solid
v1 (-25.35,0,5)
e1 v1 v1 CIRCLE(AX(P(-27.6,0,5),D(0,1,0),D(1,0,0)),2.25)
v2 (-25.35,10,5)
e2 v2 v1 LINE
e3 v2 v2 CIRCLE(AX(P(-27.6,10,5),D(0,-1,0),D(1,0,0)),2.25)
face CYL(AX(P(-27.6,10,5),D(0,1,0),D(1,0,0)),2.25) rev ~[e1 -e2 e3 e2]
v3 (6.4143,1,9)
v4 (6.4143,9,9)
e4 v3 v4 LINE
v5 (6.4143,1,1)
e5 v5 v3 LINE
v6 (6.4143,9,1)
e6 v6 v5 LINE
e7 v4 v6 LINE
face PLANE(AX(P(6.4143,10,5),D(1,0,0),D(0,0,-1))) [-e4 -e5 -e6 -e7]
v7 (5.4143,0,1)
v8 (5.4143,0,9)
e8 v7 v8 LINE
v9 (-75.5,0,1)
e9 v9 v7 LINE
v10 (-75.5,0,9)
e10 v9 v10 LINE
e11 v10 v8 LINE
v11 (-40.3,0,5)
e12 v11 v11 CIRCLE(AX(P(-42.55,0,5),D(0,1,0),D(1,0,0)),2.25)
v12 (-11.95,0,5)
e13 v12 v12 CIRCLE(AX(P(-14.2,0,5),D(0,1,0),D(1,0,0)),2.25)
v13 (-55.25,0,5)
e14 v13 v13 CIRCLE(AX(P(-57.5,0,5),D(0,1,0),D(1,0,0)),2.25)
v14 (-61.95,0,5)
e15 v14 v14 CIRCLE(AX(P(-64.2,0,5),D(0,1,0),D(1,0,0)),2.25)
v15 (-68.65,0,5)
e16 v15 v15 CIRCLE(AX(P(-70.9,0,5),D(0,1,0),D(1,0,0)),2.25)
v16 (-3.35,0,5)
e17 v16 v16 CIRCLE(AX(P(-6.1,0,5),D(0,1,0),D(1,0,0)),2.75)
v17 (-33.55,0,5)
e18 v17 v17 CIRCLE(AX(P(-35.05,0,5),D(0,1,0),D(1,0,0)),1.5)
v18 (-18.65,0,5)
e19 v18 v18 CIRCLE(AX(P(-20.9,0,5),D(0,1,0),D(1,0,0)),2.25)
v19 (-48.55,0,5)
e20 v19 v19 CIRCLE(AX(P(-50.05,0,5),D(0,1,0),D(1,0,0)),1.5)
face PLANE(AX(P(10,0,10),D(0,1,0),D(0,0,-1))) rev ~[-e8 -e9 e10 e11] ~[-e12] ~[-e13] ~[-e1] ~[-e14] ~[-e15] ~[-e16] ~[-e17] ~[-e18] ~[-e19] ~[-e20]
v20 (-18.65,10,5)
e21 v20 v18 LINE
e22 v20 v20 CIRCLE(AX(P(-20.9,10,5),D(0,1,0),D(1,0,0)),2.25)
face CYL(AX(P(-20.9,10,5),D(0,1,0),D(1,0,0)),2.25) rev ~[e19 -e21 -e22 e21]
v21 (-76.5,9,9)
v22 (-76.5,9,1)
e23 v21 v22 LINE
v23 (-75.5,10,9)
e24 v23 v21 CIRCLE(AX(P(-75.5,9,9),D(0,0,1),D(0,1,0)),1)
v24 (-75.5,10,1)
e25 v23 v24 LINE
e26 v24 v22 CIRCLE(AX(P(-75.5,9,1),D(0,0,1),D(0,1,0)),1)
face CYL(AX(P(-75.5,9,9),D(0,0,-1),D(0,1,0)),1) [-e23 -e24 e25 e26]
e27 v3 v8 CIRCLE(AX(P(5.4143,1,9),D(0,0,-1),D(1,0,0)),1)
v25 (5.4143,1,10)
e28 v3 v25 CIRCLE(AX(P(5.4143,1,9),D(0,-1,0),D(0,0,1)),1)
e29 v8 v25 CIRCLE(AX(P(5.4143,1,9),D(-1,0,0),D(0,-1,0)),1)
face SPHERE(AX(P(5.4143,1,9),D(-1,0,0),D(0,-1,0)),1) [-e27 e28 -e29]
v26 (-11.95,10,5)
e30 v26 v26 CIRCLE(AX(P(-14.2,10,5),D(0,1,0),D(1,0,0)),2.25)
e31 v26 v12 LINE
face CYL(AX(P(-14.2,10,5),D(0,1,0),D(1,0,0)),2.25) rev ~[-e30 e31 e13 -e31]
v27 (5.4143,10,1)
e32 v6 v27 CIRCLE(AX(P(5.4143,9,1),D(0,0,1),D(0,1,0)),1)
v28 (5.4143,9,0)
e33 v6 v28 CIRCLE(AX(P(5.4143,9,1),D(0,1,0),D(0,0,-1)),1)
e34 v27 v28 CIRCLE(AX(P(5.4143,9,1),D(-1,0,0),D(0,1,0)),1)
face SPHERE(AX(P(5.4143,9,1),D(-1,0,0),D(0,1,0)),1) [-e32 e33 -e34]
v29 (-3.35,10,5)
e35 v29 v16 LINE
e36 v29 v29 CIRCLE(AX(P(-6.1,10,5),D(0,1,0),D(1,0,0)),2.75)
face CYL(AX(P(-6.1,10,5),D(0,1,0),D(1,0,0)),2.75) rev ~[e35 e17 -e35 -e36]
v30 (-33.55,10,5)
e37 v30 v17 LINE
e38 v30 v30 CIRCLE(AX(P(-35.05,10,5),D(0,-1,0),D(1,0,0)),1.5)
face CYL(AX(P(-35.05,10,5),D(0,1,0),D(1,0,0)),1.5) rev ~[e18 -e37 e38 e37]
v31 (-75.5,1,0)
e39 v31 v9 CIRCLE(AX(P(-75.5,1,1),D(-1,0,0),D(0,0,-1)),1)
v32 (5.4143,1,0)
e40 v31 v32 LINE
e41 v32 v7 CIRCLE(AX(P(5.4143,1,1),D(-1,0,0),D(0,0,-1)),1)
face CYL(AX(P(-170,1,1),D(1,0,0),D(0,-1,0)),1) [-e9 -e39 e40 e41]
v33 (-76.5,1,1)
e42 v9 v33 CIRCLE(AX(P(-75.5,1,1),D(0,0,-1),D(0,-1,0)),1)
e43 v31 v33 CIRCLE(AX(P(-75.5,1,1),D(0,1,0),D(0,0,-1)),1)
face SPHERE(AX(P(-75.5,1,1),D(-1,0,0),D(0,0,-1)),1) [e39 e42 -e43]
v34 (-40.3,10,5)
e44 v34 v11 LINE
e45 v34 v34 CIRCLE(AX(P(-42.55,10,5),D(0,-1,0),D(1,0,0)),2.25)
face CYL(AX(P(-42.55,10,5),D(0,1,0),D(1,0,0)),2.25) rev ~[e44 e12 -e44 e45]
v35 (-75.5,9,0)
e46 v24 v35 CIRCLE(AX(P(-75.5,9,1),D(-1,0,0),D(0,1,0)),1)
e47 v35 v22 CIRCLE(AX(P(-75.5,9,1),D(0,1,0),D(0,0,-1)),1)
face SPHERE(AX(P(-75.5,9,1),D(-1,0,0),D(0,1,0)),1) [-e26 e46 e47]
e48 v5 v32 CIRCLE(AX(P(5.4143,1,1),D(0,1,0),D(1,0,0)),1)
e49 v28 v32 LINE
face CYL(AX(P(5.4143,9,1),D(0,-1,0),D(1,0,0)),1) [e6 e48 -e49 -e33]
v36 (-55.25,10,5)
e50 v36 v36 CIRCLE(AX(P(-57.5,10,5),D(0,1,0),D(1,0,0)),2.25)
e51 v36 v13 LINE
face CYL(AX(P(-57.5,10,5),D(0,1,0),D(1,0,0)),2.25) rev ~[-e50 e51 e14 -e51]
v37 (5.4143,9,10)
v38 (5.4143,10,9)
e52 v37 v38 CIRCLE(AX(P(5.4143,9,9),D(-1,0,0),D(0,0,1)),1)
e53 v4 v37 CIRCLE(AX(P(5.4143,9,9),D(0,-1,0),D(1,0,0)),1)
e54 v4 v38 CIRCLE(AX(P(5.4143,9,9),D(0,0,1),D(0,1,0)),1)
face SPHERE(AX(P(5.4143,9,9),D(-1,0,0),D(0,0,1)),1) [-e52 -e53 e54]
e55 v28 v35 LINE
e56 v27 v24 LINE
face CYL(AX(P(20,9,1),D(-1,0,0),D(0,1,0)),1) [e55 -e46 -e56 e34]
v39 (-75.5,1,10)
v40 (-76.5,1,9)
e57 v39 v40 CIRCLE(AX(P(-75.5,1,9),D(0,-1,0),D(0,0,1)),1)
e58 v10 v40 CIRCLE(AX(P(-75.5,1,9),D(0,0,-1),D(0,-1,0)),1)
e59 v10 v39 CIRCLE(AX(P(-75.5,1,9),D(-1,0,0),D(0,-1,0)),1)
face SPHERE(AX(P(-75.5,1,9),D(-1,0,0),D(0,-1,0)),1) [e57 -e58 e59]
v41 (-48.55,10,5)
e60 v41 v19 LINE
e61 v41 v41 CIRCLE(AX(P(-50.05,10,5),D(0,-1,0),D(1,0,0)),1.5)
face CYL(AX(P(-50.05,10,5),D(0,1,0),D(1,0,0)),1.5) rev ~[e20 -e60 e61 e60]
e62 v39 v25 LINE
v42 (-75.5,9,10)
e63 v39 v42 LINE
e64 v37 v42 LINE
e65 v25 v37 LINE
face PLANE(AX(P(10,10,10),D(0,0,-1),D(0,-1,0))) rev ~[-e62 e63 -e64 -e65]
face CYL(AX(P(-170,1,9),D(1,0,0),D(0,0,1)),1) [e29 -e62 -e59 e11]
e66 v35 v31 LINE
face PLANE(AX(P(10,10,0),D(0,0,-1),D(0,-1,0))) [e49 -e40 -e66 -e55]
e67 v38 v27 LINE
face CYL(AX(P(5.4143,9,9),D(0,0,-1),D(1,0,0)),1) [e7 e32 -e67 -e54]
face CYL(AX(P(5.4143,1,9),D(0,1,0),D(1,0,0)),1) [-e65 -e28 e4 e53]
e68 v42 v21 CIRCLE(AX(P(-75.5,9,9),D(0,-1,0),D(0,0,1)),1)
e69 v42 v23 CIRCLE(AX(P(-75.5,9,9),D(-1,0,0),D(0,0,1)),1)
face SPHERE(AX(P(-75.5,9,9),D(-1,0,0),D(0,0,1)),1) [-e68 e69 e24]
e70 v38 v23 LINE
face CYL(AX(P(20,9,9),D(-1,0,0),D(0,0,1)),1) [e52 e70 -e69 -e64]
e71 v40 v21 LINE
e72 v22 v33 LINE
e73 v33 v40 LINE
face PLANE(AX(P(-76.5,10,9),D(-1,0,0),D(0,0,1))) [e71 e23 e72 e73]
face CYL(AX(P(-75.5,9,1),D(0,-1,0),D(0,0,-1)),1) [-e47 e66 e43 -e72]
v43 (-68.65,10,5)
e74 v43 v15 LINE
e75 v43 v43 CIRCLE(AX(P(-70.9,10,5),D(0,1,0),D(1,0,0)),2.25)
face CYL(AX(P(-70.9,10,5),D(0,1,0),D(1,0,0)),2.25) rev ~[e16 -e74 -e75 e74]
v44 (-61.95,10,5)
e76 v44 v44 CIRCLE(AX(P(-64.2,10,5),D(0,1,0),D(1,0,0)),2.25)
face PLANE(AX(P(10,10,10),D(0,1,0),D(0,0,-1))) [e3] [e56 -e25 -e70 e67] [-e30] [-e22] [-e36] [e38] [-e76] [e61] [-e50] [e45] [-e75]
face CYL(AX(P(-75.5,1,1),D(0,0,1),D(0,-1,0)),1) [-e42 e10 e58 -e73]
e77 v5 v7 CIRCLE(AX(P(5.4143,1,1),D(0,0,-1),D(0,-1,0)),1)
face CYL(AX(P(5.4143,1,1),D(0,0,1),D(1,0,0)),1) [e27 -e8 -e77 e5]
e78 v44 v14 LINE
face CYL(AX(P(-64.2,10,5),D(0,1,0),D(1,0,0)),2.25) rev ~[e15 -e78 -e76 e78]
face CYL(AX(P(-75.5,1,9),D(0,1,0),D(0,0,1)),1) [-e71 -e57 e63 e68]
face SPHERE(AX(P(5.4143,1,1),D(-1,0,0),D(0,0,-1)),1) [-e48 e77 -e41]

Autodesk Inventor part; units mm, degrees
ref_plane "YZ Plane" through (0, 0, 0) normal (1, 0, 0) x (0, 1, 0)
ref_plane "XZ Plane" through (0, 0, 0) normal (0, 1, 0) x (-1, 0, 0)
ref_plane "XY Plane" through (0, 0, 0) normal (0, 0, 1) x (1, 0, 0)
sketch "Sketch1" plane through (0, 0, 0) normal (0, 1, 0) x (-1, 0, 0)
  line L0 (0, 0) -> (170, 0)
  line L1 (170, 0) -> (170, 10)
  line L2 (170, 10) -> (0, 10)
  line L3 (0, 10) -> (0, 0)
  dimension "d0" = 170
  dimension "d1" = 10
extrude "Extrusion1" add sketch "Sketch1" along normal blind 10
sketch "Sketch2" plane through (0, 10, 0) normal (0, 1, 0) x (1, 0, 0)
  line L0 (0, -10) -> (0, 0) projected
  line L1 (0, -5) -> (-2.2, -5)
  circle A0 centre (-6.1, -5) radius 3.9
  line L2 (0, 0) -> (-170, 0) projected
  line L3 (-170, -10) -> (0, -10) projected
  circle A1 centre (-75, -5) radius 1.5
  circle A2 centre (-95, -5) radius 1.5
  dimension "d4" = 2.2
  dimension "d8" = 3
  dimension "d9" = 3
extrude "Extrusion2" cut sketch "Sketch2" against normal blind 10 contours A1
extrude "Extrusion3" cut sketch "Sketch2" against normal blind 10 contours A2
extrude "Extrusion4" cut sketch "Sketch2" against normal blind 10 contours A0
sketch "Sketch3" plane through (0, 10, 0) normal (0, 1, 0) x (1, 0, 0)
  line L0 (-170, 0) -> (-170, -10) projected
  line L1 (-170, -5) -> (-10, -5)
  circle A0 centre (-6.1, -5) radius 3.9 projected
  line L2 (-165.7, -5) -> (-163.45, -5)
  circle A1 centre (-163.45, -5) radius 2.25
  circle A2 centre (-153.45, -5) radius 2.25
  circle A3 centre (-143.45, -5) radius 2.25
  circle A4 centre (-133.45, -5) radius 2.25
  circle A5 centre (-123.45, -5) radius 2.25
  circle A6 centre (-113.45, -5) radius 2.25
  circle A7 centre (-103.45, -5) radius 2.25
  circle A8 centre (-95, -5) radius 1.5 projected
  line L3 (-93.5, -5) -> (-93.5, -7.9104)
  circle A9 centre (-75, -5) radius 1.5 projected
  line L4 (-76.5, -5) -> (-76.5, -7.25)
  line L5 (-93.5, -5) -> (-76.5, -5)
  line L6 (-85, -5) -> (-93.5, -5)
  line L7 (-85, -5) -> (-76.5, -5)
  circle A10 centre (-80.75, -5) radius 2.25
  circle A11 centre (-89.25, -5) radius 2.25
  line L8 (-10, -5) -> (-12, -5)
  line L9 (-10, -5) -> (-14.3, -5)
  line L10 (-14.3, -5) -> (-16.55, -5)
  circle A12 centre (-16.55, -5) radius 2.25
  circle A13 centre (-26.55, -5) radius 2.25
  circle A14 centre (-36.55, -5) radius 2.25
  circle A15 centre (-46.55, -5) radius 2.25
  circle A16 centre (-56.55, -5) radius 2.25
  circle A17 centre (-66.55, -5) radius 2.25
  point P0 (0, 0)
  point P1 (-155.7, -5)
  point P2 (-145.7, -5)
  point P3 (-135.7, -5)
  point P4 (-125.7, -5)
  point P5 (-115.7, -5)
  point P6 (-105.7, -5)
  point P7 (-24.3, -5)
  point P8 (-34.3, -5)
  point P9 (-44.3, -5)
  point P10 (-54.3, -5)
  point P11 (-64.3, -5)
  dimension "d20" = 10
  dimension "d32" = 10
extrude "Extrusion5" cut sketch "Sketch3" against normal blind 10 contours A1 L1 | L1 A1 | L1 A12 | L1 A12 | A2 L1 | L1 A2 | A3 L1 | L1 A3 | A4 L1 | L1 A4 | A5 L1 | L1 A5 | A6 L1 | L1 A6 | A7 L1 | L1 A7 | A11 L1 | L1 A11 | A10 L1 | L1 A10 | A17 L1 | L1 A17 | A16 L1 | L1 A16 | A15 L1 | L1 A15 | A14 L1 | L1 A14 | A13 L1 | L1 A13
thread "Thread1" size "M3x0.5" class "6H" standard "ANSI Metric M Profile" full length
thread "Thread2" size "M3x0.5" class "6H" standard "ANSI Metric M Profile" full length
sketch "Sketch4" plane through (0, 10, 0) normal (0, 1, 0) x (1, 0, 0)
  circle A0 centre (-16.55, -5) radius 2.25 projected
  circle A1 centre (-16.55, -5) radius 2.25
  point P0 (0, 0)
extrude "Extrusion6" add sketch "Sketch4" against normal blind 10
sketch "Sketch5" plane through (0, 0, 10) normal (1, 0, 0) x (0, 0, -1)
  line L0 (10, 0) -> (0, 0) projected
  line L1 (0, 0) -> (0, 10) projected
  line L2 (10, 0) -> (0, 0)
  line L3 (0, 0) -> (0, 10)
  line L4 (0, 10) -> (10, 10)
  line L5 (10, 10) -> (10, 0)
extrude "Extrusion7" add sketch "Sketch5" along normal blind 10
sketch "Sketch6" plane through (10, 0, 10) normal (1, 0, 0) x (0, 0, -1)
  line L0 (0, 0) -> (10, 0) projected
  line L1 (0, 10) -> (0, 0) projected
  line L2 (10, 0) -> (0, 0)
  line L3 (0, 0) -> (0, 10)
  line L4 (0, 10) -> (10, 10)
  line L5 (10, 10) -> (10, 0)
extrude "Extrusion8" add sketch "Sketch6" along normal blind 10
sketch "Sketch7" plane through (0, 10, 0) normal (0, 1, 0) x (1, 0, 0)
  point P0 (0, 0)
fillet "Fillet3" radius 1 11 edges at (-75, 10, 10) (-75, 0, 10) (-75, 10, 0) (20, 5, 10) (20, 5, 0) (20, 0, 5) (-170, 10, 5) (-170, 5, 10) (-170, 5, 0) (-170, 0, 5) (-75, 0, 0)
fillet "Fillet4" radius 1 3 edges at (19.7071, 9.7071, 9.7071) (19.7071, 9.7071, 0.2929) (20, 10, 5)
sketch "Sketch8" plane through (19, 1, 0) normal (0, 0, -1) x (-1, 0, 0)
  point P0 (19, -1)
sketch "Sketch9" plane through (0, 10, 0) normal (0, 1, 0) x (1, 0, 0)
  circle A0 centre (-6.1, -5) radius 3.9 projected
  circle A1 centre (-6.1, -5) radius 2.5
  point P0 (0, 0)
  dimension "d53" = 5
extrude "Extrusion9" add sketch "Sketch9" against normal blind 10
sketch "Sketch10" plane through (0, 10, 0) normal (0, 1, 0) x (1, 0, 0)
  circle A0 centre (-6.1, -5) radius 2.5 projected
  line L0 (-3.6, -5) -> (1.4, -5)
  line L1 (19, -9) -> (19, -1) projected
  line L2 (1.4, -5) -> (-76.5, -5)
  circle A1 centre (-75, -5) radius 1.5 projected
  line L3 (-76.5, -5) -> (-76.5, -10.0231)
  line L4 (-76.5, -10.0231) -> (-76.5, 0)
  line L5 (-76.5, -10.0231) -> (-169.9715, -10.0231)
  line L6 (-169, -9) -> (19, -9) projected
  line L7 (-169.9715, 0) -> (-76.5, 0)
  line L8 (-169.9715, -10.0231) -> (-170.1763, -9.372)
  line L9 (-170.1763, -9.372) -> (-170.4489, -3.7164)
  line L10 (-170.4489, -3.7164) -> (-170.4593, -3.5)
  line L11 (-170.4593, -3.5) -> (-170.4593, -0.543)
  line L12 (-170.4593, -0.543) -> (-169.9715, 0)
  point P0 (0, 0)
  dimension "d56" = 5
extrude "Extrusion10" cut sketch "Sketch10" against normal blind 10 contours L3 L5 L8 L9 L10 L11 L12 L7 L4
sketch "Sketch11" plane through (0, 10, 0) normal (0, 1, 0) x (1, 0, 0)
  circle A0 centre (-75, -5) radius 1.5 projected
  circle A1 centre (-75, -5) radius 1.5
  circle A2 centre (-66.55, -5) radius 2.25 projected
  circle A3 centre (-66.55, -5) radius 2.25
  circle A4 centre (-56.55, -5) radius 2.25 projected
  circle A5 centre (-56.55, -5) radius 2.25
  circle A6 centre (-46.55, -5) radius 2.25 projected
  circle A7 centre (-46.55, -5) radius 2.25
  circle A8 centre (-36.55, -5) radius 2.25 projected
  circle A9 centre (-36.55, -5) radius 2.25
  circle A10 centre (-26.55, -5) radius 2.25 projected
  circle A11 centre (-26.55, -5) radius 2.25
  point P0 (0, 0)
  point P1 (-76.5, -5)
extrude "Extrusion11" add sketch "Sketch11" against normal blind 10
sketch "Sketch12" plane through (0, 10, 0) normal (0, 1, 0) x (1, 0, 0)
  circle A0 centre (-6.1, -5) radius 2.5 projected
  line L0 (-8.6, -5) -> (-76.5, -5)
  line L1 (-76.5, -9) -> (-76.5, -1) projected
  line L2 (-42.55, -5) -> (-27.55, -5)
  line L3 (-42.55, -5) -> (-57.55, -5)
  line L4 (-42.55, -5) -> (-50.05, -5)
  line L5 (-42.55, -5) -> (-35.05, -5)
  circle A1 centre (-50.05, -5) radius 1.5
  circle A2 centre (-35.05, -5) radius 1.5
  line L6 (-3.6, -5) -> (6.4143, -5)
  line L7 (6.4143, -5) -> (6.4143, -10.3738)
  line L8 (6.4143, -10.3738) -> (6.4143, 1.3096)
  line L9 (6.4143, 1.3096) -> (23.7189, 1.3096)
  line L10 (23.7189, 1.3096) -> (24.3802, -13.5702)
  line L11 (24.3802, -13.5702) -> (6.4143, -10.3738)
  point P0 (0, 0)
  dimension "d61" = 15
  dimension "d62" = 15
  dimension "d63" = 3
  dimension "d64" = 3
extrude "Extrusion12" cut sketch "Sketch12" against normal blind 10 contours A2 L0 | L0 A2 | A1 L0 | L0 A1 | L8 L9 L10 L11 L7
sketch "Sketch13" plane through (0, 10, 0) normal (0, 1, 0) x (1, 0, 0)
  circle A0 centre (-50.05, -5) radius 1.5 projected
  line L0 (-48.55, -5) -> (-36.55, -5)
  circle A1 centre (-35.05, -5) radius 1.5 projected
  circle A2 centre (-42.55, -5) radius 2.25
  line L1 (-51.55, -5) -> (-55.25, -5)
  line L2 (-33.55, -5) -> (-29.85, -5)
  circle A3 centre (-57.5, -5) radius 2.25
  circle A4 centre (-27.6, -5) radius 2.25
  circle A5 centre (-20.9, -5) radius 2.25
  circle A6 centre (-14.2, -5) radius 2.25
  circle A7 centre (-64.2, -5) radius 2.25
  circle A8 centre (-70.9, -5) radius 2.25
  point P0 (0, 0)
  dimension "d67" = 4.5
  dimension "d68" = 3.7
  dimension "d69" = 3.7
  dimension "d71" = 4.5
  dimension "d73" = 4.5
  dimension "d83" = 6.7
  dimension "d90" = 6.7
extrude "Extrusion13" cut sketch "Sketch13" against normal blind 10 contours A3 | A4 | A5 | A6 | A7 | A8
sketch "Sketch14" plane through (0, 10, 0) normal (0, 1, 0) x (1, 0, 0)
  circle A0 centre (-57.5, -5) radius 2.25 projected
  line L0 (-55.25, -5) -> (-29.85, -5)
  circle A1 centre (-27.6, -5) radius 2.25 projected
  circle A2 centre (-42.55, -5) radius 2.25
  point P0 (0, 0)
  dimension "d97" = 4.5
extrude "Extrusion14" cut sketch "Sketch14" against normal blind 10 contours A2 L0 | L0 A2
thread "Thread3" size "M3x0.5" class "6H" standard "ANSI Metric M Profile" full length
thread "Thread4" size "M3x0.5" class "6H" standard "ANSI Metric M Profile" full length
fillet "Fillet5" radius 1 16 edges at (-76.5, 9.7071, 9.7071) (-76.5, 5, 10) (-76.5, 0.2929, 9.7071) (-76.5, 0, 5) (-76.5, 0.2929, 0.2929) (-76.5, 5, 0) (-76.5, 9.7071, 0.2929) (-76.5, 10, 5) (6.4143, 9.7071, 0.2929) (6.4143, 5, 0) (6.4143, 0.2929, 0.2929) (6.4143, 0, 5) (6.4143, 0.2929, 9.7071) (6.4143, 5, 10) (6.4143, 9.7071, 9.7071) (6.4143, 10, 5)
sketch "Sketch15" plane through (0, 10, 0) normal (0, 1, 0) x (1, 0, 0)
  circle A0 centre (-6.1, -5) radius 2.5 projected
  circle A1 centre (-6.1, -5) radius 2.75
  point P0 (0, 0)
  dimension "d105" = 5.5
extrude "Extrusion15" cut sketch "Sketch15" against normal blind 10 contours A0 | A1
properties part number "brazo de servo el d vdd - camara"
